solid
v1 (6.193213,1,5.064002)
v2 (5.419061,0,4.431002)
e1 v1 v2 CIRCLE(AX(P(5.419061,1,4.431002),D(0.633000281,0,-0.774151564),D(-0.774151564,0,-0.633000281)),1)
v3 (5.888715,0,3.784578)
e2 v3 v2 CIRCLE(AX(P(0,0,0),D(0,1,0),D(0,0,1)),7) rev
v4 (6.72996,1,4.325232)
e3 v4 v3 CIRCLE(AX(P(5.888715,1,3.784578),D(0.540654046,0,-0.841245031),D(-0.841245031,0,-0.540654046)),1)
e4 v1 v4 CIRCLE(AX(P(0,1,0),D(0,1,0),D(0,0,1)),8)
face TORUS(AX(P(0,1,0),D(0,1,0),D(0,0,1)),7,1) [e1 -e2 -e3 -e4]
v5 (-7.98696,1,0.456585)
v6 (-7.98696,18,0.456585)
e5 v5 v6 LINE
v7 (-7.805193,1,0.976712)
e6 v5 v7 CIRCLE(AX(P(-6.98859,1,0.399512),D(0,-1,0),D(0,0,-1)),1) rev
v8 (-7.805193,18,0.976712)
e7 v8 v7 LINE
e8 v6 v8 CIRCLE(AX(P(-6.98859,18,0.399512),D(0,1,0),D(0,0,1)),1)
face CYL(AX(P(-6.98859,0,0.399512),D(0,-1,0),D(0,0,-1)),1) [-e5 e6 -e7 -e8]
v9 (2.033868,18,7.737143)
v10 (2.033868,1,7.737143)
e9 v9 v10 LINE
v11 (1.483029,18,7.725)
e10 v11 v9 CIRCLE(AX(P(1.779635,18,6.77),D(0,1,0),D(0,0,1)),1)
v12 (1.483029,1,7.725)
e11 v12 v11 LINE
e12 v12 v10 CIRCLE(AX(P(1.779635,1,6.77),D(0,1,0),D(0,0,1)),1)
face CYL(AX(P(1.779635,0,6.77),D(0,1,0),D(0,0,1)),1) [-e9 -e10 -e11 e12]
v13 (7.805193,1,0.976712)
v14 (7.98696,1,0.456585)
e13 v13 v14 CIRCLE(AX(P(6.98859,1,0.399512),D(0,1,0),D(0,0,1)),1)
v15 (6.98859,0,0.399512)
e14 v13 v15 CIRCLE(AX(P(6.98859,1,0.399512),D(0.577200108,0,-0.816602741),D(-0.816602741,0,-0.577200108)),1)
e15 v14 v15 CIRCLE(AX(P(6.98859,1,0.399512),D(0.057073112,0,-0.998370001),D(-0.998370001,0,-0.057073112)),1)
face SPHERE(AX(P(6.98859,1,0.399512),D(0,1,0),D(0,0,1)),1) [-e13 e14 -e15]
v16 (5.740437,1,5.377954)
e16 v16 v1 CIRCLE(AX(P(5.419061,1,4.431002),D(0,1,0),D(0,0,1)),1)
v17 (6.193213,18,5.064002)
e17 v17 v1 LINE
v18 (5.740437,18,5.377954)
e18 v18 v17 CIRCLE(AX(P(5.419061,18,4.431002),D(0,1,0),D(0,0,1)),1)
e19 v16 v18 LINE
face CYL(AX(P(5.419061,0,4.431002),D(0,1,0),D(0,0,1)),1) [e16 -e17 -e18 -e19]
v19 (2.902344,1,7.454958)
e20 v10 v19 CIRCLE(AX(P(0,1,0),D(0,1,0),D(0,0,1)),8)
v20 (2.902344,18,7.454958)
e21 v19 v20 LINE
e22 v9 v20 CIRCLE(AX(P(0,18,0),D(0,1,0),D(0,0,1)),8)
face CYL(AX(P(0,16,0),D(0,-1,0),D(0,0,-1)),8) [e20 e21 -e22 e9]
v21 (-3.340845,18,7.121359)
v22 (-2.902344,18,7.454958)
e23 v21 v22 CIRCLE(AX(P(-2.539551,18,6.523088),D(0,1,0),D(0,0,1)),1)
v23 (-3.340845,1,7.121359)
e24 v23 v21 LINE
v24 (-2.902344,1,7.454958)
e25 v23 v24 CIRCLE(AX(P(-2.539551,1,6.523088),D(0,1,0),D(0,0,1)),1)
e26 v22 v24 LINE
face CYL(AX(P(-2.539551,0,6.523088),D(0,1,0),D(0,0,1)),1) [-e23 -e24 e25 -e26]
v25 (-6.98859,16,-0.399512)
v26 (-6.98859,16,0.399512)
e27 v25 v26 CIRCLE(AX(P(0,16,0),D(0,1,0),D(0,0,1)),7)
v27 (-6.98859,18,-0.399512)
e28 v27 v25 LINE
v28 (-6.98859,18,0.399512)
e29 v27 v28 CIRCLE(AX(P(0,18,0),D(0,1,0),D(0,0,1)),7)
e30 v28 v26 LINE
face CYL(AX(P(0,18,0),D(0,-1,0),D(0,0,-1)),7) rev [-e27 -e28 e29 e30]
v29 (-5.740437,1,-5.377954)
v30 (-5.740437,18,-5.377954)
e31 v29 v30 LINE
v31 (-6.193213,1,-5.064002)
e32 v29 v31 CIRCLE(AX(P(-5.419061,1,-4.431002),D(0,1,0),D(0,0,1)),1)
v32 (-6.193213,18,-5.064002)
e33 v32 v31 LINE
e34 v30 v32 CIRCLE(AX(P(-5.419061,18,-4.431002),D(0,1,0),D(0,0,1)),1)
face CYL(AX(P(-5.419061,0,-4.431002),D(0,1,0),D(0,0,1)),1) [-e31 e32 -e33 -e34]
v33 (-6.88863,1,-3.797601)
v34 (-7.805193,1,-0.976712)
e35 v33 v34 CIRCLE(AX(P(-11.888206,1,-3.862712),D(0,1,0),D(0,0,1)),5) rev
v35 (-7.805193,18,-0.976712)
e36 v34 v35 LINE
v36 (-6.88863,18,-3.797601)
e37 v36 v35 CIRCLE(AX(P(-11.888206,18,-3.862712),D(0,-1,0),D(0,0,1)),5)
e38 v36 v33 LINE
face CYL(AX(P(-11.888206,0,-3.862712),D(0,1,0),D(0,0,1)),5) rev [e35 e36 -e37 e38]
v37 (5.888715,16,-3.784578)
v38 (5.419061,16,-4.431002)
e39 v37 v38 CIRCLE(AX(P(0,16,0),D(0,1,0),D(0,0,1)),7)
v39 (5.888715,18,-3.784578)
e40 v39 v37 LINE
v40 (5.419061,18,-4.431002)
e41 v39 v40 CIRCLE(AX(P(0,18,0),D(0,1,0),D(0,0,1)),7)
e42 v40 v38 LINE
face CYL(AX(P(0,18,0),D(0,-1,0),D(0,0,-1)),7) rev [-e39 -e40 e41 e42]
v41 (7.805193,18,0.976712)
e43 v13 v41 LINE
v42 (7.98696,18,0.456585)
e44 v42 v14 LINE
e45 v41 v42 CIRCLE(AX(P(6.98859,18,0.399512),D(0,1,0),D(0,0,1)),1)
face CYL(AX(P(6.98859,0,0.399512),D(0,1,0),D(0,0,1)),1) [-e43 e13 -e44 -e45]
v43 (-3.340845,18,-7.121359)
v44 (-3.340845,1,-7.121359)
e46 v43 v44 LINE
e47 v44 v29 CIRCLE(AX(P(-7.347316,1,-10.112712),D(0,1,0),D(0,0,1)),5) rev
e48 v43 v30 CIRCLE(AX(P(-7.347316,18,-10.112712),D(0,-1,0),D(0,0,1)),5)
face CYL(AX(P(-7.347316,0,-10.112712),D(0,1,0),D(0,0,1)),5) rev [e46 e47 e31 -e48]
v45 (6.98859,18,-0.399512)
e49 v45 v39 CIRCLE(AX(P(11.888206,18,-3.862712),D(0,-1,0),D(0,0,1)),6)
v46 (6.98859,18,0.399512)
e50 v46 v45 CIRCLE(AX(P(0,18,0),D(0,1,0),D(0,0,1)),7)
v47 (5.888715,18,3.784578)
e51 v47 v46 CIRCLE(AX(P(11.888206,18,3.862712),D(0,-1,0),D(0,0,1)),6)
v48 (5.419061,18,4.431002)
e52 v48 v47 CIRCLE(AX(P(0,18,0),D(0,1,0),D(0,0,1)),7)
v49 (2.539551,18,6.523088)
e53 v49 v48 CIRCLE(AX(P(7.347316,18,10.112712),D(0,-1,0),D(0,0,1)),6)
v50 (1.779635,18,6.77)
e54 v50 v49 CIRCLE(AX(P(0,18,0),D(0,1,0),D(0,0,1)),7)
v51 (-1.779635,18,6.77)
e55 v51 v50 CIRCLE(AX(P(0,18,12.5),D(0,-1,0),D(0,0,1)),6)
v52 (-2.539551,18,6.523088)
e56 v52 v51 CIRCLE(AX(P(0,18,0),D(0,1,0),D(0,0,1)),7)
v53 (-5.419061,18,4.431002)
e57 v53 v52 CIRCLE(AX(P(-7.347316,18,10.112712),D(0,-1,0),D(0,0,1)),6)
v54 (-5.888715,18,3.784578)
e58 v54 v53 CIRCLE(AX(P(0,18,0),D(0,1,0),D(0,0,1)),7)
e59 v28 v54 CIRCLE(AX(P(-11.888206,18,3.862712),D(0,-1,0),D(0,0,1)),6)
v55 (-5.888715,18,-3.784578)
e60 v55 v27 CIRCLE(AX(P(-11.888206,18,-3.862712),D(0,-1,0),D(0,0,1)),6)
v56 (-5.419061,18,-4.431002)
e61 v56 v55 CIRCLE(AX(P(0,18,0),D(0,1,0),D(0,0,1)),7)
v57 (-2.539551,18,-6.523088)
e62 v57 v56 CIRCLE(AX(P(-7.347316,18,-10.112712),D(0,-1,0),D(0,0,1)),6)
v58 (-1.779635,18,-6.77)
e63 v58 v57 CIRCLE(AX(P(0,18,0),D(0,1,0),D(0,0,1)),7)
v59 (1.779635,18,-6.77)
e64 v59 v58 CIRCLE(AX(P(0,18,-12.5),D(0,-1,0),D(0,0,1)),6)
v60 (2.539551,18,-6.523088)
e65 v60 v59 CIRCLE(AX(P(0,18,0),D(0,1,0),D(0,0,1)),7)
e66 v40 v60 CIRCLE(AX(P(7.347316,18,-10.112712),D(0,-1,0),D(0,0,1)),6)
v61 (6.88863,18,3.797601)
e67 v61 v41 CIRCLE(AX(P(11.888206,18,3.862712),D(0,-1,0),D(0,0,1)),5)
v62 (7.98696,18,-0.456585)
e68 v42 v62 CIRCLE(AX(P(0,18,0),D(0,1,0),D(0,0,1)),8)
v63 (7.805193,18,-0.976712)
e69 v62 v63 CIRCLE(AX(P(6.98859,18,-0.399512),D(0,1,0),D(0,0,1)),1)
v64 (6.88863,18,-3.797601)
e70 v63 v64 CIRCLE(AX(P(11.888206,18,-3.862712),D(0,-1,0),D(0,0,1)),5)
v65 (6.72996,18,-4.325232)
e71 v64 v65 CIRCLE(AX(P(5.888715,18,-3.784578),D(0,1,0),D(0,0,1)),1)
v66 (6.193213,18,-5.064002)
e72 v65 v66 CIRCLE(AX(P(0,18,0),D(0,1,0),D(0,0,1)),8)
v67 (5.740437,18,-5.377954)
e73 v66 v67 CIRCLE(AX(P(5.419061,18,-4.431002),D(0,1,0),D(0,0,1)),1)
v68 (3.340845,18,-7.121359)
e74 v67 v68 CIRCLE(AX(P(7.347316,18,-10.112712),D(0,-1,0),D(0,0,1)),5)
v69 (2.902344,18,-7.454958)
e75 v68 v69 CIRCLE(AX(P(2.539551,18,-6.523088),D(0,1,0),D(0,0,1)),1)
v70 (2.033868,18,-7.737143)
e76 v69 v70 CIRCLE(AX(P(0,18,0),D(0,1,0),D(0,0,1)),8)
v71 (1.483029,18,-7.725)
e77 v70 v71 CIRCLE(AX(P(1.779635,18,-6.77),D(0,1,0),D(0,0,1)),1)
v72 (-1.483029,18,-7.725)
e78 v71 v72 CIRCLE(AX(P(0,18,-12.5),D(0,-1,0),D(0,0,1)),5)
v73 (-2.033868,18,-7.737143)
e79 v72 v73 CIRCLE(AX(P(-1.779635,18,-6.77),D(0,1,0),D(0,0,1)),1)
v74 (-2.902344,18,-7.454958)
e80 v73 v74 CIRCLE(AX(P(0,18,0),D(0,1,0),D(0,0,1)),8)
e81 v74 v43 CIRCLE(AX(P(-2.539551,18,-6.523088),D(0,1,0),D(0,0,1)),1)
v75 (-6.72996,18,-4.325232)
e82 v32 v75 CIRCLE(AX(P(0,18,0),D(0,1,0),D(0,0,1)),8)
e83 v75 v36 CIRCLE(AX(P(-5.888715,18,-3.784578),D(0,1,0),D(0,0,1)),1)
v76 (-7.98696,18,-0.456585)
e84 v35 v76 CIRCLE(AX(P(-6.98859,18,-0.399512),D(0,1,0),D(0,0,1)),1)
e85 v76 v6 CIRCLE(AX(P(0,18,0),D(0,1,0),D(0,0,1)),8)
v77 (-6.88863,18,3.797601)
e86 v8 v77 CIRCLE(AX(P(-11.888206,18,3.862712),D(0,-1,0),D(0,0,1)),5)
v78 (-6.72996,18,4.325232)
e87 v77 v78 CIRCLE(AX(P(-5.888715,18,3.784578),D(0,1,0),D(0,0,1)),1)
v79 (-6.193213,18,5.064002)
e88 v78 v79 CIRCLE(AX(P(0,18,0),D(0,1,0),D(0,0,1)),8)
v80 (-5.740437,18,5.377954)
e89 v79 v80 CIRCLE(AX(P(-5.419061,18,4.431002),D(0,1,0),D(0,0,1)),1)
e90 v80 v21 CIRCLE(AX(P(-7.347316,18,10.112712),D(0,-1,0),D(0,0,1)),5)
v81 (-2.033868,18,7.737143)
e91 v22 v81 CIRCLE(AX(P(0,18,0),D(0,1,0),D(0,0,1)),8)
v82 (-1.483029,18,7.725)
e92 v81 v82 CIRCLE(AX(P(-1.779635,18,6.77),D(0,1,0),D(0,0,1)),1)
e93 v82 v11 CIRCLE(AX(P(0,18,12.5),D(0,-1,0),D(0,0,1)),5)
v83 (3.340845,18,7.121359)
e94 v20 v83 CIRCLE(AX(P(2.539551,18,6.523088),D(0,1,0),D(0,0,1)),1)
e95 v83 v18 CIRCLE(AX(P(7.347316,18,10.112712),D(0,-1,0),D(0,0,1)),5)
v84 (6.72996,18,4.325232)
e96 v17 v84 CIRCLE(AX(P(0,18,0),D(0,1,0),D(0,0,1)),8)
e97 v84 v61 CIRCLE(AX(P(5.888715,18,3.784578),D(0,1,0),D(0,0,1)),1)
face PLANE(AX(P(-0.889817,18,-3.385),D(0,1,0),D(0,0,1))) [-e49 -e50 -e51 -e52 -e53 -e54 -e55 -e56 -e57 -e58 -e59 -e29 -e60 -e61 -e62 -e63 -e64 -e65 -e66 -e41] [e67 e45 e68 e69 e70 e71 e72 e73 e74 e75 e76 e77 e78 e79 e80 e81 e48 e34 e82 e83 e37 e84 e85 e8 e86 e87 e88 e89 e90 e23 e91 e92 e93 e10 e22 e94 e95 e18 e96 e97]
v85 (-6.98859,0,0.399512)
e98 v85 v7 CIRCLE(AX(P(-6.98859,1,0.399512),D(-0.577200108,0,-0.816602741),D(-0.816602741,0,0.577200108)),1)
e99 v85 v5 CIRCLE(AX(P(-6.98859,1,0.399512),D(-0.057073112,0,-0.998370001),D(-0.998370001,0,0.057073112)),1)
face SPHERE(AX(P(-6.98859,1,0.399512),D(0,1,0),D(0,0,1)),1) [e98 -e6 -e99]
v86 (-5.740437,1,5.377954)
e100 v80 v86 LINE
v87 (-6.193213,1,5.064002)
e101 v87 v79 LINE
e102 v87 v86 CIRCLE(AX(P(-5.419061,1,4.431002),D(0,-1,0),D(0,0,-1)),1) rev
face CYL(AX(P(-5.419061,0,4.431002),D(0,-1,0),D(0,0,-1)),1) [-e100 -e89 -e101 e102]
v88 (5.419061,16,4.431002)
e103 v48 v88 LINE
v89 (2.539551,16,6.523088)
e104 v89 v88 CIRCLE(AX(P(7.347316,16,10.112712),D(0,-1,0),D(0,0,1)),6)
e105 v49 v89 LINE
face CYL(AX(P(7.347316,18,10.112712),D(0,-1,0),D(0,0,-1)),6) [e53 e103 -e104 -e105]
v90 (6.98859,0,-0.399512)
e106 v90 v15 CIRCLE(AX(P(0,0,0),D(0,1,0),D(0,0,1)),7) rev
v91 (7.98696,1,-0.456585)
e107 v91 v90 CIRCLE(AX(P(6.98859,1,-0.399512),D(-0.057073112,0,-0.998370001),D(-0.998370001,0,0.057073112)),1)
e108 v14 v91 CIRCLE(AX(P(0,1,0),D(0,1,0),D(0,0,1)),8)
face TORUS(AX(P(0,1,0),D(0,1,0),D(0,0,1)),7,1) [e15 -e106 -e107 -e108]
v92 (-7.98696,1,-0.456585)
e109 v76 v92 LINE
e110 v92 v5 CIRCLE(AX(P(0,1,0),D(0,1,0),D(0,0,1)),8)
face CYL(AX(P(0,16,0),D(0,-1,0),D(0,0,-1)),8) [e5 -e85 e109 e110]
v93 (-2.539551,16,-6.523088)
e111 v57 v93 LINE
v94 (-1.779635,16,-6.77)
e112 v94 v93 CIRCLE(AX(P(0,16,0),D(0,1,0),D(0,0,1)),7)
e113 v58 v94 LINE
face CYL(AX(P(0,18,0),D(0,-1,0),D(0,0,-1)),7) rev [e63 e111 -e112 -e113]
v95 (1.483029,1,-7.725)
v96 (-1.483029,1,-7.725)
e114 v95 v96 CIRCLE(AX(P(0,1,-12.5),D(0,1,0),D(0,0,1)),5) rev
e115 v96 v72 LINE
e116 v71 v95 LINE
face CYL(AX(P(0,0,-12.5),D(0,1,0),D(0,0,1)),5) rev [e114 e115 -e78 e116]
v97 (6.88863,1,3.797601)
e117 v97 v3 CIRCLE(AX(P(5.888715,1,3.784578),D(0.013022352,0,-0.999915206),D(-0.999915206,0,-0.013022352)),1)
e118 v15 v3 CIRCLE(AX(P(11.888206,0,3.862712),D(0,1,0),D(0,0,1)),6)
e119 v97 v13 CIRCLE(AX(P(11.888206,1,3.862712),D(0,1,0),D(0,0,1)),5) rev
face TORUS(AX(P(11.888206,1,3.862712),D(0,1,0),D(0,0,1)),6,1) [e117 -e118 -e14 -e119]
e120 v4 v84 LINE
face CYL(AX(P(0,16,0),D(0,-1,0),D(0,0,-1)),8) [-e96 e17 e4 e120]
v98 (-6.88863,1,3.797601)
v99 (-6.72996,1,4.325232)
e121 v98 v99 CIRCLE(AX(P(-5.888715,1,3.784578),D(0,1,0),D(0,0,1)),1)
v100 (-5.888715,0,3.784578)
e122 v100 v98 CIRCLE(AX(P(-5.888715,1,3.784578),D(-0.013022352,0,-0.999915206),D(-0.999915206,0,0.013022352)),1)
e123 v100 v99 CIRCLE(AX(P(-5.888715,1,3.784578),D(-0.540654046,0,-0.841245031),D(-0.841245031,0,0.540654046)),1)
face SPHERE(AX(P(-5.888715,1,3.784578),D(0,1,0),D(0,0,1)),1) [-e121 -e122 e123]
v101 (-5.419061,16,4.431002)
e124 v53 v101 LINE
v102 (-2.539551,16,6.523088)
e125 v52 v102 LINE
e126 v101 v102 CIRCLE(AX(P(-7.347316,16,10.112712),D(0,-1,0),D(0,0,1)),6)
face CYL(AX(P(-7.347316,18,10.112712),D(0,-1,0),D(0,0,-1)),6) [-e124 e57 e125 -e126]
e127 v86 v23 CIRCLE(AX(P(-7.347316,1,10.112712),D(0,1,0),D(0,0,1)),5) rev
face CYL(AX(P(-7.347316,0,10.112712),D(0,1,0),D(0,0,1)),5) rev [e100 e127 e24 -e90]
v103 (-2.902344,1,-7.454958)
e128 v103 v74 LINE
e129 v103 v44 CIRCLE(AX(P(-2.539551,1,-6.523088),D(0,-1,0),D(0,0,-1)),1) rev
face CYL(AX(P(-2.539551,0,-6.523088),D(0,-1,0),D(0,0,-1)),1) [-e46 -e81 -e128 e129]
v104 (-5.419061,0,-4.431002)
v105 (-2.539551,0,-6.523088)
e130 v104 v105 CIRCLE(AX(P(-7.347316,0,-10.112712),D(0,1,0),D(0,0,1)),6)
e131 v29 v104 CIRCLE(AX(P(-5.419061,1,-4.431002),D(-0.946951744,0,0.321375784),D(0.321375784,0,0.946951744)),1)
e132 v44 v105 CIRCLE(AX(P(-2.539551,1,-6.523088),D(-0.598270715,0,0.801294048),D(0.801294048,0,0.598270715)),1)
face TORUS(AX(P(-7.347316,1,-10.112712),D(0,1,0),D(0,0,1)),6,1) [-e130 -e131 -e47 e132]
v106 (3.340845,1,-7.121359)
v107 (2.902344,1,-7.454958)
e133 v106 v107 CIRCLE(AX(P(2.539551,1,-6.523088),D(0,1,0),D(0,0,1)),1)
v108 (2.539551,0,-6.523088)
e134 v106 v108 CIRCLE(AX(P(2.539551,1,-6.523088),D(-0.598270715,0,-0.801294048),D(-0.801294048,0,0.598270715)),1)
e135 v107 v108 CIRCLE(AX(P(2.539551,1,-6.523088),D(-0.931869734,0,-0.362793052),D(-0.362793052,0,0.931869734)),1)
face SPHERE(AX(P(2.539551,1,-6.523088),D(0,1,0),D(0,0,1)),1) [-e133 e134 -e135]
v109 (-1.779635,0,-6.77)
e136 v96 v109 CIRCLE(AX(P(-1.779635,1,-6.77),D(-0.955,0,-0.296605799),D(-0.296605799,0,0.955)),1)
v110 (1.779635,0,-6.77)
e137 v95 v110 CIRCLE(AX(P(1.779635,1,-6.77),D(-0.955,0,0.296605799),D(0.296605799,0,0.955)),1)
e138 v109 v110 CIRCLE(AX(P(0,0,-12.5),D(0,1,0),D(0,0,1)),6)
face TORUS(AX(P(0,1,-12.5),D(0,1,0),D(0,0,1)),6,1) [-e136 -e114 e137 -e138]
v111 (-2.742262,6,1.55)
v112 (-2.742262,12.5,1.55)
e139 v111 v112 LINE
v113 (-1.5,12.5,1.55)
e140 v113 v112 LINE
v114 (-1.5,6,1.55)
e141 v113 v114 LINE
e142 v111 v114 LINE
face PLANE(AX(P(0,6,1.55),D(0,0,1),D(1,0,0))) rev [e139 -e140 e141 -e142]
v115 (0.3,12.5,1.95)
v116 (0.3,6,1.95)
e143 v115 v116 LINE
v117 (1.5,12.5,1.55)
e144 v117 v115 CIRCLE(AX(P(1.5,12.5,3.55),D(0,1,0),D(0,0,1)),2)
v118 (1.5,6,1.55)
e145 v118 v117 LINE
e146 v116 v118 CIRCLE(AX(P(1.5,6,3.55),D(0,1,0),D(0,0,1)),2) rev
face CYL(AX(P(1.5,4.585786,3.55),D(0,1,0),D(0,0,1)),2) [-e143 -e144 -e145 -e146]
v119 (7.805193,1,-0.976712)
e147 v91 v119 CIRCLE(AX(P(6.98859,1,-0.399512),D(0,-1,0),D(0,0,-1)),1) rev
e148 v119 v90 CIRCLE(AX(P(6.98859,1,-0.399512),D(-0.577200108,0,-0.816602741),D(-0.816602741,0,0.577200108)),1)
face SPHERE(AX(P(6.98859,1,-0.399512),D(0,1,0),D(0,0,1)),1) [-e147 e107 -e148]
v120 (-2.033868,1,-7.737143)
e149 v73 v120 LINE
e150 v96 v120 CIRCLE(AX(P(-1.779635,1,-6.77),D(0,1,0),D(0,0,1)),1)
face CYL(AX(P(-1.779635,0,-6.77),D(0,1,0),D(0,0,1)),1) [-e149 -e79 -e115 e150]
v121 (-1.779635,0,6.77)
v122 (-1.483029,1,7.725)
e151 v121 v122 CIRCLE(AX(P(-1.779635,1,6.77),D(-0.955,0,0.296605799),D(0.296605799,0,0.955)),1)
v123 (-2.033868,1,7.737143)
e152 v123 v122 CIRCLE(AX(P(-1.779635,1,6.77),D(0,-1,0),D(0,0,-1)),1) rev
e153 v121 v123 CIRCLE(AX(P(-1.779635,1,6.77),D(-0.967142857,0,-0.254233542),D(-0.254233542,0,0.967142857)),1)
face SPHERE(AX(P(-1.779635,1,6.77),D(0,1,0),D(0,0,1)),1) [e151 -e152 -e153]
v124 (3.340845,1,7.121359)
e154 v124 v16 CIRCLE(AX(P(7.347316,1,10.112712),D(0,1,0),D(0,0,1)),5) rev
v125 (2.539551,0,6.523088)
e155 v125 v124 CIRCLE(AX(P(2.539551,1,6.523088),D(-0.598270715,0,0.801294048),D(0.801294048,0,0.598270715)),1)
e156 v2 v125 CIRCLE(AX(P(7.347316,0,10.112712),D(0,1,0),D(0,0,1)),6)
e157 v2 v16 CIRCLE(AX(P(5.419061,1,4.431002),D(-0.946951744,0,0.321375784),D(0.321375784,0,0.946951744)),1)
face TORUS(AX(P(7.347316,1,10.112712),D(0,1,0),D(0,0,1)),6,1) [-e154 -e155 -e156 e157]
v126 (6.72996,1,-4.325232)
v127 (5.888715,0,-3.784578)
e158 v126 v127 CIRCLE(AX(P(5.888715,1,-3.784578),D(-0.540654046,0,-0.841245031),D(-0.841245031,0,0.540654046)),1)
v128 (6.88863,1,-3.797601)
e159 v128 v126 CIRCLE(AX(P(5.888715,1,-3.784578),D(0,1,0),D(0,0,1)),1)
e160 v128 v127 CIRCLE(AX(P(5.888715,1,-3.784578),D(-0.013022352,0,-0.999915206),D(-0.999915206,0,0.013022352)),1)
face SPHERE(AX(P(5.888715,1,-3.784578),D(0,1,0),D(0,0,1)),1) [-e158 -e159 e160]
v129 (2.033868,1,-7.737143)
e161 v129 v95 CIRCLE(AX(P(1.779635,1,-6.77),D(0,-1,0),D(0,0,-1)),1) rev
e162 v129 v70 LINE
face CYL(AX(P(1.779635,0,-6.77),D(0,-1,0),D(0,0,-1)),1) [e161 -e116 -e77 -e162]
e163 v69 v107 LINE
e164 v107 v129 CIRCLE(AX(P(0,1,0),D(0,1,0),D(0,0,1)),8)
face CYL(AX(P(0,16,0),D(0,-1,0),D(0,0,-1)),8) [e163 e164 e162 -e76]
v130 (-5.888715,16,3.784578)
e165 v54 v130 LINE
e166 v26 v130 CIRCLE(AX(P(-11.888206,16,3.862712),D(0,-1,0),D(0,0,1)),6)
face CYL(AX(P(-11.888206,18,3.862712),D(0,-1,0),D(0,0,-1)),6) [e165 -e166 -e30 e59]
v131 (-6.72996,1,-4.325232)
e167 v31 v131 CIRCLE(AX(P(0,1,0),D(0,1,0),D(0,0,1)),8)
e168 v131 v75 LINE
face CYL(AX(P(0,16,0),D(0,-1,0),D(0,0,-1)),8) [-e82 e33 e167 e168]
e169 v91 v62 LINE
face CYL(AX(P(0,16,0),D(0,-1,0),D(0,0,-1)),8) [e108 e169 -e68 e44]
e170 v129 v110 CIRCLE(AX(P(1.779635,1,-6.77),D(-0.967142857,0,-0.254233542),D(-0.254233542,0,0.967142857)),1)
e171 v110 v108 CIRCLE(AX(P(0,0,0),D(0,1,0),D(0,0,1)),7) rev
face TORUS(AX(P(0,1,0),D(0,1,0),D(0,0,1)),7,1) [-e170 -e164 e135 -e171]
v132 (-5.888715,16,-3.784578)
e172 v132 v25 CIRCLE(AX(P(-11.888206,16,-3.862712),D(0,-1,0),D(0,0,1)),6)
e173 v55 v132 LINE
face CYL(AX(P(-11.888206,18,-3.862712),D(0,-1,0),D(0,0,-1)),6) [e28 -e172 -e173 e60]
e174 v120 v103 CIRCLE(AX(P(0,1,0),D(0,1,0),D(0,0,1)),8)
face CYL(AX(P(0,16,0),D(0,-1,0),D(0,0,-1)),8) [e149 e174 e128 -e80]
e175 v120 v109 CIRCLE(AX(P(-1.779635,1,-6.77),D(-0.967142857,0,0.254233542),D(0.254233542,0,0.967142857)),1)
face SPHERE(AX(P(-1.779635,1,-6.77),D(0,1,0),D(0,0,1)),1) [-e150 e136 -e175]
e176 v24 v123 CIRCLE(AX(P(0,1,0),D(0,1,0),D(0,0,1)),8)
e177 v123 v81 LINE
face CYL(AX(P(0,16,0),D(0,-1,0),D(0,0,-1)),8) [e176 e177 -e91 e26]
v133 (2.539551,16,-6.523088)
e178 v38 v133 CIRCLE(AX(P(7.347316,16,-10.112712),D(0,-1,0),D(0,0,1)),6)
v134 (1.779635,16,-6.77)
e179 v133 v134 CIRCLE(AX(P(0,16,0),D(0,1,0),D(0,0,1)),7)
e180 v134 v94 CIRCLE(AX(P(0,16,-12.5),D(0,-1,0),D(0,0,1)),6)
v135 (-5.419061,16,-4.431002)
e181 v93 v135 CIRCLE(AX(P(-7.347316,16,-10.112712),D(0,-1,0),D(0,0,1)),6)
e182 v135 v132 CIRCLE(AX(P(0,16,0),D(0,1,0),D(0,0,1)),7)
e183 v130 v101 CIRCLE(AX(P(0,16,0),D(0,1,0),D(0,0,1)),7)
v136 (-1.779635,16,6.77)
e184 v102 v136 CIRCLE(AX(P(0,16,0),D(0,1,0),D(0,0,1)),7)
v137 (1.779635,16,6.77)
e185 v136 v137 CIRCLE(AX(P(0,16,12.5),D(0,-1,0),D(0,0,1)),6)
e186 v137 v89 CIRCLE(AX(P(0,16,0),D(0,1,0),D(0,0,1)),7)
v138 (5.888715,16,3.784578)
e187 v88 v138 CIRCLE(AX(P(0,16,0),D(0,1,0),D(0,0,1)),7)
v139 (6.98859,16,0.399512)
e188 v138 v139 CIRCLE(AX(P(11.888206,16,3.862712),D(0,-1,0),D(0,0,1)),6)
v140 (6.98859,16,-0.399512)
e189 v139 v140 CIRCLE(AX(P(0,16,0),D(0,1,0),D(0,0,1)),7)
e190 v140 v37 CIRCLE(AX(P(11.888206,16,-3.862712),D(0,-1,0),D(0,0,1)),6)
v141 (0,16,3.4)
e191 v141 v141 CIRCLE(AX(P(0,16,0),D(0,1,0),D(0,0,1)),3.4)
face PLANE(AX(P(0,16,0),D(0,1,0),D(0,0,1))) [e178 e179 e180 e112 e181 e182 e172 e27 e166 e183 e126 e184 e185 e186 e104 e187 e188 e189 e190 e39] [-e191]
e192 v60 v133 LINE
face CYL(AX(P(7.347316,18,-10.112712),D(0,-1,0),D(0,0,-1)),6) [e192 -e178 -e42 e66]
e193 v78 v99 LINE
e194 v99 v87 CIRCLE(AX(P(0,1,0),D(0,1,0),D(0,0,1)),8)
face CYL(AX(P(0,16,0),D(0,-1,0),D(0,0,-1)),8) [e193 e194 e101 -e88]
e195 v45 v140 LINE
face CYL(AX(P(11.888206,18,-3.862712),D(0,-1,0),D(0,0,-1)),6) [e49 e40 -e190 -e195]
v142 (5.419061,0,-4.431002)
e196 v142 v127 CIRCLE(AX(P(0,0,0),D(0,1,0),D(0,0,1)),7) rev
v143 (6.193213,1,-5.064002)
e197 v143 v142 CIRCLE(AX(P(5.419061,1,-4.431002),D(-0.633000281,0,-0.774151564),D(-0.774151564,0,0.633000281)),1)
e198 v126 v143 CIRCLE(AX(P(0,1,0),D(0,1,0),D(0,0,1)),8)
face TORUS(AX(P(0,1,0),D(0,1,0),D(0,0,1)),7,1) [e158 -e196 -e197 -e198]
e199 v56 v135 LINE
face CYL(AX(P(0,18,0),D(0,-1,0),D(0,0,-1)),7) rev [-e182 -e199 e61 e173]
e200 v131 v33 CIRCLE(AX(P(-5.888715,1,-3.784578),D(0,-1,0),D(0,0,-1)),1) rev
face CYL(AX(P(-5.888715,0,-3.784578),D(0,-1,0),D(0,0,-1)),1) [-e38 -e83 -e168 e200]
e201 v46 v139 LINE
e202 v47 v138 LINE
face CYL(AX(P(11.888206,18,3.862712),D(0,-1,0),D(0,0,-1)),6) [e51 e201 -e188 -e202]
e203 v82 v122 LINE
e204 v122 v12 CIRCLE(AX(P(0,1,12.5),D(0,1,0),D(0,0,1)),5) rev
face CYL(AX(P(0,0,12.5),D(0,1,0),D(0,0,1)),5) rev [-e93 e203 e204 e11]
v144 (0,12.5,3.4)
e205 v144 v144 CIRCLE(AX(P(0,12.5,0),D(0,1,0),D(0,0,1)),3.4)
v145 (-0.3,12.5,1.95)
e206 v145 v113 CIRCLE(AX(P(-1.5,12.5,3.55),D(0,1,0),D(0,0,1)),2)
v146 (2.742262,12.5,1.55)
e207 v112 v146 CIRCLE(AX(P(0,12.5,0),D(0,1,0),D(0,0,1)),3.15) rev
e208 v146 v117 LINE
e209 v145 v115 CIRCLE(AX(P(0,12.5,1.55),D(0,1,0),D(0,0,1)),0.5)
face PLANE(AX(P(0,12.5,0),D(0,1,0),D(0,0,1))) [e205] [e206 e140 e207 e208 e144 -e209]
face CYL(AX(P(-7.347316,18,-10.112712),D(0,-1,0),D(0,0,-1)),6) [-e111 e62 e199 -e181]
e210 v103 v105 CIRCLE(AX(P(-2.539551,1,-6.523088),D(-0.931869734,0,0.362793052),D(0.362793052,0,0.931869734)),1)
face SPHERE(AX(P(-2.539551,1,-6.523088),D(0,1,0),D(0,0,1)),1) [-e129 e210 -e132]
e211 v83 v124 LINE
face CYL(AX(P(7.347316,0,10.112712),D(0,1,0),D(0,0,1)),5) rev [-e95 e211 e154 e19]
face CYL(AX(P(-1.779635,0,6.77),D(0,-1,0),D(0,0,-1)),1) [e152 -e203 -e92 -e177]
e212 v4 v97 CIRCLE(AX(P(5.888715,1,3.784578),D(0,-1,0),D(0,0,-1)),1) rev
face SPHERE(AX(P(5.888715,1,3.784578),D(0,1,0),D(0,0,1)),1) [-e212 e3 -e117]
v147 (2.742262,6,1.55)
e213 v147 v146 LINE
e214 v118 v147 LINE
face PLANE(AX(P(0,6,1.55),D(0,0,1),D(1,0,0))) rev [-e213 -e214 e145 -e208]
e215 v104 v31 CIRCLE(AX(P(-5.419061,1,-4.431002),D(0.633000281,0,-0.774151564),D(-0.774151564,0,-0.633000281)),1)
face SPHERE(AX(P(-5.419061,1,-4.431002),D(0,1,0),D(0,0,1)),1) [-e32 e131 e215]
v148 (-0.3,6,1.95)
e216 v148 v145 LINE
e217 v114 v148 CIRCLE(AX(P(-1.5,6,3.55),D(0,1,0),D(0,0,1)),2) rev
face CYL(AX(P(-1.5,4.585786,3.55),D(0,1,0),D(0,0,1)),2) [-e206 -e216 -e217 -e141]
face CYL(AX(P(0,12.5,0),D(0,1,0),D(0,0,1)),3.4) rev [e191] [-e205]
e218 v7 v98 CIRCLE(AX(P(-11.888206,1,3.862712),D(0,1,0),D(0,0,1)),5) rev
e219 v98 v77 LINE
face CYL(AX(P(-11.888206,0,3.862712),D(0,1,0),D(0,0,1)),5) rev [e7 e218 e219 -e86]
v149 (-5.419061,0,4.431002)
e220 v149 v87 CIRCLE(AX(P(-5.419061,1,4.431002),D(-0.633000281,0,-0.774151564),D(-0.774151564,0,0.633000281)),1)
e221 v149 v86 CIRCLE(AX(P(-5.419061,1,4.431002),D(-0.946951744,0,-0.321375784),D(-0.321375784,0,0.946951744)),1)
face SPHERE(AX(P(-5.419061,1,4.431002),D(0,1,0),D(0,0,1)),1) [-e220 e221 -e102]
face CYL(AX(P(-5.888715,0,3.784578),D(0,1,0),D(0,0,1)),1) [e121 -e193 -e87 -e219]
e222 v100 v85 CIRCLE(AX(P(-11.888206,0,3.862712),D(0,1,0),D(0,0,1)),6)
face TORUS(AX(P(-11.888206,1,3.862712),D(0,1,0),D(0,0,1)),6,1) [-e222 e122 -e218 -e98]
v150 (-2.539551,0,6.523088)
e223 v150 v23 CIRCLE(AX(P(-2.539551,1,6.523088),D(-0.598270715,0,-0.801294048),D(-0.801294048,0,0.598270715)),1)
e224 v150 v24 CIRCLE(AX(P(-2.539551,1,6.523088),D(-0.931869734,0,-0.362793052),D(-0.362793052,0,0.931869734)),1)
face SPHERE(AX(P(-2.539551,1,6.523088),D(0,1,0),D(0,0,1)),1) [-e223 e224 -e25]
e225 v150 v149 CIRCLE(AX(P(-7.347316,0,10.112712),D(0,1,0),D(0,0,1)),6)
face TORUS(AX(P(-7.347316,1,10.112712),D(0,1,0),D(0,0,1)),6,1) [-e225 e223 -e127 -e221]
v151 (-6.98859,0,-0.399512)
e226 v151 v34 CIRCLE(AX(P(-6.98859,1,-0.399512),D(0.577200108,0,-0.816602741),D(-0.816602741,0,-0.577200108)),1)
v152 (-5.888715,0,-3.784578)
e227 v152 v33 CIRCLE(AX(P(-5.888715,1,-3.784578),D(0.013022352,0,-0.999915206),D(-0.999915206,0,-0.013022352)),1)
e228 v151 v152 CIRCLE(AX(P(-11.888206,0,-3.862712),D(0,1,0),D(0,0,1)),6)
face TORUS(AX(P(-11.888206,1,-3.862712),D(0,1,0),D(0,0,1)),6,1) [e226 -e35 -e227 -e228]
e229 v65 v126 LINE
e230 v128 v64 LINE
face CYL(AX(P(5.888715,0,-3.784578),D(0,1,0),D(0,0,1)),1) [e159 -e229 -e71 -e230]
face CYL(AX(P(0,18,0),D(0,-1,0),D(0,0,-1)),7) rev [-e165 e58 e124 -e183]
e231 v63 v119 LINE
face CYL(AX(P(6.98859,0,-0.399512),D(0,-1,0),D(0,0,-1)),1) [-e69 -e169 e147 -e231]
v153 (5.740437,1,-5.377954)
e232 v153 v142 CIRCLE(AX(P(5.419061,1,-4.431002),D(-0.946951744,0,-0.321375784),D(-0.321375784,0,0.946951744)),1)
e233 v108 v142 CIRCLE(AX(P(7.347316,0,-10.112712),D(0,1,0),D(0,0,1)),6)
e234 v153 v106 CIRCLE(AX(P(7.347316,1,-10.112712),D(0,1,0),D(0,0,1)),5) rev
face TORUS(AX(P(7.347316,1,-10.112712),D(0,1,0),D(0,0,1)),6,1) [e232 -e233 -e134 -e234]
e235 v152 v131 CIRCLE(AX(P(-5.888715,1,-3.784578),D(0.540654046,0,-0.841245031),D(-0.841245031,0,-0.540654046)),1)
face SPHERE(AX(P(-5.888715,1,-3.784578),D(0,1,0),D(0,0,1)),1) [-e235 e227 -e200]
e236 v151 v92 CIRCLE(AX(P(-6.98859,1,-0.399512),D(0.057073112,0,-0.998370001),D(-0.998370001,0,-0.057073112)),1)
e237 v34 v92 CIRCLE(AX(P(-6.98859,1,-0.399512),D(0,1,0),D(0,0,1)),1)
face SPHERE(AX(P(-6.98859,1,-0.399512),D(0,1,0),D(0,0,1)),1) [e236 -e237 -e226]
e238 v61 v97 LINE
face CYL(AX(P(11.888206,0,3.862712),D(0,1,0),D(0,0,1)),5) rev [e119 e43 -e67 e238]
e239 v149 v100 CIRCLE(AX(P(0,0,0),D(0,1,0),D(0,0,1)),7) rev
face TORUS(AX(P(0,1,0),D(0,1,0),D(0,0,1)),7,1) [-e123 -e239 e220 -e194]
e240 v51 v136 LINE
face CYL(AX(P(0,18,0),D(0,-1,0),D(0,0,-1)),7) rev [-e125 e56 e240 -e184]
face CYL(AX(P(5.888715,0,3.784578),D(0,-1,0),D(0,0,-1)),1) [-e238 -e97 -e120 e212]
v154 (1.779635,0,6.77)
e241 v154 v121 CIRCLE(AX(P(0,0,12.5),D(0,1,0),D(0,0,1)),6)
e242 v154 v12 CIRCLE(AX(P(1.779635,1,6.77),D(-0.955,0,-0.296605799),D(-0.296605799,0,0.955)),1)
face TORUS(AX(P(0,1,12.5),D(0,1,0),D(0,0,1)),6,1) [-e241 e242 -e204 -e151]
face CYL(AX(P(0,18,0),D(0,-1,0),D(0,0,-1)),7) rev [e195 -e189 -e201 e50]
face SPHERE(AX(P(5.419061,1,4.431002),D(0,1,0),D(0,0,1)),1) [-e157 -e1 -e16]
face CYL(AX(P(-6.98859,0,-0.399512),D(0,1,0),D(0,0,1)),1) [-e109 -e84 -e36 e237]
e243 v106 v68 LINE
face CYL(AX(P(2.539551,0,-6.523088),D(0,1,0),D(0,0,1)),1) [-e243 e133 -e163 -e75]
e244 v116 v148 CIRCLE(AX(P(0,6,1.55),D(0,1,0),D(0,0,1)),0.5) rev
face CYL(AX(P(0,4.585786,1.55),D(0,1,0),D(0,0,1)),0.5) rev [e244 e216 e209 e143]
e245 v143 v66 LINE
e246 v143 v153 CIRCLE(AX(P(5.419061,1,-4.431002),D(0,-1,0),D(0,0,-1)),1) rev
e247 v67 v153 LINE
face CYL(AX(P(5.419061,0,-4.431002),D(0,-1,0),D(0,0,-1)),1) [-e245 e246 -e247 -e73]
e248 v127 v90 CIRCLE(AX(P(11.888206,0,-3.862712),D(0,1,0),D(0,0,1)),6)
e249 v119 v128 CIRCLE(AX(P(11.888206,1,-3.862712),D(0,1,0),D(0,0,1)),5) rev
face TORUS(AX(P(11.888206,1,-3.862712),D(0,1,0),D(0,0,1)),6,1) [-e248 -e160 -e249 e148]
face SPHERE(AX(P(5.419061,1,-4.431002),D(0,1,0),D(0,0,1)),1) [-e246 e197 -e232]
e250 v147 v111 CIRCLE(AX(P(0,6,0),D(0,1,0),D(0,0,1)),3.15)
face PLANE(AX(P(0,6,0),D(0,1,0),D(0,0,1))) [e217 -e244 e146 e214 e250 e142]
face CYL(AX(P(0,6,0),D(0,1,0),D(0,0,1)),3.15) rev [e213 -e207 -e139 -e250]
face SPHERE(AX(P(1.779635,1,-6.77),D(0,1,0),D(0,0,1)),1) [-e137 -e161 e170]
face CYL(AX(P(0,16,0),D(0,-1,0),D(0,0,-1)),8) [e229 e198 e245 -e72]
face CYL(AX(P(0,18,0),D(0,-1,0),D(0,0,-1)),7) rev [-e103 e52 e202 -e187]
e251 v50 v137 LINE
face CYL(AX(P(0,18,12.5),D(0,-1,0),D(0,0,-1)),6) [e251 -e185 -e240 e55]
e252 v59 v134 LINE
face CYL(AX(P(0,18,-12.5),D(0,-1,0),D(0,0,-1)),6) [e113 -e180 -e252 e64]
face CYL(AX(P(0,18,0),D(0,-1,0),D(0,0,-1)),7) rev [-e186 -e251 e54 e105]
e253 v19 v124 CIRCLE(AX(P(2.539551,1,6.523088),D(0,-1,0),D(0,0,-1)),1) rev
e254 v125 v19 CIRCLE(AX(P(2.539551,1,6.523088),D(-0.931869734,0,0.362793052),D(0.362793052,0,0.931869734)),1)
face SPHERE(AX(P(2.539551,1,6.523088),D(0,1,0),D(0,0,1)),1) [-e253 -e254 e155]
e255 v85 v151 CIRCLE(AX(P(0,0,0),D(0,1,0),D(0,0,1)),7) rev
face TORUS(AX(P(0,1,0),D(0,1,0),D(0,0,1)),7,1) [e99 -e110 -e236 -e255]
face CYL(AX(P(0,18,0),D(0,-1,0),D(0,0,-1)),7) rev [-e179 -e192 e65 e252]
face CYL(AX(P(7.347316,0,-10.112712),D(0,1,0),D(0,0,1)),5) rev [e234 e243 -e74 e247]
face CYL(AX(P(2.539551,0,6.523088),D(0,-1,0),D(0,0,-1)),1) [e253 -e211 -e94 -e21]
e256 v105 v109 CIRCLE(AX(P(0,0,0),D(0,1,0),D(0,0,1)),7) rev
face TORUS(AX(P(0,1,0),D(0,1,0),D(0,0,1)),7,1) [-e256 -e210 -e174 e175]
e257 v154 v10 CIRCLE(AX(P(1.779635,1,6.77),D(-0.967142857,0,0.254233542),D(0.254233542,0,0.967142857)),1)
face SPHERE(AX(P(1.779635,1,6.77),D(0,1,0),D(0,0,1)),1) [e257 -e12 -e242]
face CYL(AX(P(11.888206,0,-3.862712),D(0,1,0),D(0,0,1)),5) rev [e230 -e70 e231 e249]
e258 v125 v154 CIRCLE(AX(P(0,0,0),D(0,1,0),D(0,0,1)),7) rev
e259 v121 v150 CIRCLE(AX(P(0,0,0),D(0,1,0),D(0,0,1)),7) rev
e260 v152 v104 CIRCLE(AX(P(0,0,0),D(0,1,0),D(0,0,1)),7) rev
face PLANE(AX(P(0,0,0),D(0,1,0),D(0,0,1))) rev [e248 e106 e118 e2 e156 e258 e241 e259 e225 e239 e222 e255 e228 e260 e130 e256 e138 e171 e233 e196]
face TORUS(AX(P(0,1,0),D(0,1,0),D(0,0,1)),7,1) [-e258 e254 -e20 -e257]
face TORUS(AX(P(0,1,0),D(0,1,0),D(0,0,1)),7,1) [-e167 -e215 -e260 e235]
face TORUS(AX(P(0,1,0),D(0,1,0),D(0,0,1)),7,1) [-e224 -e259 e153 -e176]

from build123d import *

# Parameters (mm, degrees)
ESQUISSE1_R                  = 8
BOSS_EXTRU_1_DEPTH           = 16
ENL_V_MAT_EXTRU_1_DEPTH      = 10
ESQUISSE3_R                  = 5
ENL_V_MAT_EXTRU_2_DEPTH      = 20.595917942
R_P_TITION_CIRCULAIRE1_COUNT = 10
CONG_1_R                     = 1
CONG_2_R                     = 1
BOSS_EXTRU_2_DEPTH           = 2
ESQUISSE5_R                  = 3.4
ENL_V_MAT_EXTRU_3_DEPTH      = 3.5
ESQUISSE6_R                  = 0.5
ENL_V_MAT_EXTRU_4_DEPTH      = 6.5
CONG_3_R                     = 2


# Some blends are built 0.0001 mm under size
with BuildPart() as part:
    # Esquisse1 → Boss.-Extru.1 (new body)
    with BuildSketch(Plane(origin=(0, 0, 0), x_dir=(1, 0, 0), z_dir=(0, 1, 0))):
        with Locations(Location((0, 0, 0), (0, 0, 270))):
            Circle(ESQUISSE1_R)
    extrude(amount=BOSS_EXTRU_1_DEPTH)

    # Esquisse2 → Enlèv. mat.-Extru.1 (cut)
    with BuildSketch(Plane(origin=(0, 16, 0), x_dir=(1, 0, 0), z_dir=(0, 1, 0))):
        with BuildLine():
            ThreePointArc((0, 3.15), (-2.720753572, 1.587450787), (-2.74226184, -1.55))
            Line((-2.74226184, -1.55), (0, -1.55))
            Line((0, -1.55), (0, 3.15))
        make_face()
        with BuildLine():
            Line((0, 3.15), (0, -1.55))
            Line((0, -1.55), (2.74226184, -1.55))
            ThreePointArc((2.74226184, -1.55), (3.046360517, -0.801366085), (3.15, 0))
            ThreePointArc((3.15, 0), (2.227386361, 2.227386361), (0, 3.15))
        make_face()
    extrude(amount=-ENL_V_MAT_EXTRU_1_DEPTH, mode=Mode.SUBTRACT)

    # Esquisse3 → Enlèv. mat.-Extru.2 (cut, through all)
    with BuildSketch(Plane(origin=(0, 16, 0), x_dir=(1, 0, 0), z_dir=(0, 1, 0))):
        with Locations((0, 12.5)):
            Circle(ESQUISSE3_R)
    enl_v_mat_extru_2 = extrude(amount=-ENL_V_MAT_EXTRU_2_DEPTH, mode=Mode.SUBTRACT)

    # Répétition circulaire1: Enlèv. mat.-Extru.2 ×10 about axis
    r_p_tition_circulaire1_axis = Axis((0, 0, 0), (0, 1, 0))
    for i in range(1, R_P_TITION_CIRCULAIRE1_COUNT):
        add(enl_v_mat_extru_2.rotate(r_p_tition_circulaire1_axis, i * 360 / R_P_TITION_CIRCULAIRE1_COUNT), mode=Mode.SUBTRACT)

    # Congé1
    cong_1_edges = [part.edges().sort_by_distance(p)[0] for p in [
        (1.733176275, 8, -7.81),
        (-1.733176275, 8, -7.81),
        (-3.18843376, 8, -7.33715818),
        (-5.992771881, 8, -5.299687272),
        (-6.892170469, 8, -4.061771316),
        (-7.963332315, 8, -0.765074136),
        (-1.733176275, 8, 7.81),
        (1.733176275, 8, 7.81),
        (-7.963332315, 8, 0.765074136),
        (-6.892170469, 8, 4.061771316),
        (-5.992771881, 8, 5.299687272),
        (-3.18843376, 8, 7.33715818),
        (3.18843376, 8, 7.33715818),
        (5.992771881, 8, 5.299687272),
        (6.892170469, 8, 4.061771316),
        (7.963332315, 8, 0.765074136),
        (7.963332315, 8, -0.765074136),
        (6.892170469, 8, -4.061771316),
        (5.992771881, 8, -5.299687272),
        (3.18843376, 8, -7.33715818),
    ]]
    fillet(cong_1_edges, radius=CONG_1_R)

    # Congé2
    cong_2_edges = [part.edges().sort_by_distance(p)[0] for p in [
        (-2.472135955, 0, -7.60845213),
        (-6.472135955, 0, -4.702282018),
        (-4.408389392, 0, -6.067627458),
        (0, 0, -7.5),
        (2.472135955, 0, -7.60845213),
        (4.408389392, 0, -6.067627458),
        (6.472135955, 0, -4.702282018),
        (7.132923872, 0, -2.317627458),
        (8, 0, 0),
        (7.132923872, 0, 2.317627458),
        (6.472135955, 0, 4.702282018),
        (4.408389392, 0, 6.067627458),
        (2.472135955, 0, 7.60845213),
        (0, 0, 7.5),
        (-2.472135955, 0, 7.60845213),
        (-4.408389392, 0, 6.067627458),
        (-6.472135955, 0, 4.702282018),
        (-7.132923872, 0, 2.317627458),
        (-8, 0, 0),
        (-7.132923872, 0, -2.317627458),
        (-6.846351136, 0, -4.072559992),
        (-5.988873569, 0, -5.252776613),
        (-3.145023717, 0, -7.318954474),
        (-7.932605121, 0, -0.729413986),
        (-7.932605121, 0, 0.729413986),
        (-6.846351136, 0, 4.072559992),
        (-5.988873569, 0, 5.252776613),
        (-3.145023717, 0, 7.318954474),
        (-1.757595867, 0, 7.769757109),
        (1.757595867, 0, 7.769757109),
        (3.145023717, 0, 7.318954474),
        (5.988873569, 0, 5.252776613),
        (6.846351136, 0, 4.072559992),
        (7.932605121, 0, 0.729413986),
        (7.932605121, 0, -0.729413986),
        (6.846351136, 0, -4.072559992),
        (5.988873569, 0, -5.252776613),
        (3.145023717, 0, -7.318954474),
        (1.757595867, 0, -7.769757109),
        (-1.757595867, 0, -7.769757109),
    ]]
    fillet(cong_2_edges, radius=CONG_2_R - 0.0001)  # a hair under: the kernel refuses the full size

    # Esquisse4 → Boss.-Extru.2 (add)
    with BuildSketch(Plane(origin=(0, 16, 0), x_dir=(1, 0, 0), z_dir=(0, 1, 0))):
        with BuildLine():
            ThreePointArc((-1.483028995, 7.725), (0, 7.5), (1.483028995, 7.725))
            ThreePointArc((1.483028995, 7.725), (1.757595867, 7.769757113), (2.033868336, 7.737142857))
            ThreePointArc((2.033868336, 7.737142857), (2.472135955, 7.60845213), (2.902344418, 7.454957872))
            ThreePointArc((2.902344418, 7.454957872), (3.145023719, 7.318954477), (3.340845414, 7.121358854))
            ThreePointArc((3.340845414, 7.121358854), (4.408389392, 6.067627458), (5.740436734, 5.37795371))
            ThreePointArc((5.740436734, 5.37795371), (5.988873571, 5.252776617), (6.193212514, 5.064002246))
            ThreePointArc((6.193212514, 5.064002246), (6.472135955, 4.702282018), (6.729960252, 4.325232365))
            ThreePointArc((6.729960252, 4.325232365), (6.84635114, 4.072559993), (6.888630426, 3.797600671))
            ThreePointArc((6.888630426, 3.797600671), (7.132923872, 2.317627458), (7.805192751, 0.976711892))
            ThreePointArc((7.805192751, 0.976711892), (7.932605125, 0.729413987), (7.986960012, 0.456584897))
            ThreePointArc((7.986960012, 0.456584897), (8, 0), (7.986960012, -0.456584897))
            ThreePointArc((7.986960012, -0.456584897), (7.932605125, -0.729413987), (7.805192751, -0.976711892))
            ThreePointArc((7.805192751, -0.976711892), (7.132923872, -2.317627458), (6.888630426, -3.797600671))
            ThreePointArc((6.888630426, -3.797600671), (6.84635114, -4.072559993), (6.729960252, -4.325232365))
            ThreePointArc((6.729960252, -4.325232365), (6.472135955, -4.702282018), (6.193212514, -5.064002246))
            ThreePointArc((6.193212514, -5.064002246), (5.988873571, -5.252776617), (5.740436734, -5.37795371))
            ThreePointArc((5.740436734, -5.37795371), (4.408389392, -6.067627458), (3.340845414, -7.121358854))
            ThreePointArc((3.340845414, -7.121358854), (3.145023719, -7.318954477), (2.902344418, -7.454957872))
            ThreePointArc((2.902344418, -7.454957872), (2.472135955, -7.60845213), (2.033868336, -7.737142857))
            ThreePointArc((2.033868336, -7.737142857), (1.757595867, -7.769757113), (1.483028995, -7.725))
            ThreePointArc((1.483028995, -7.725), (0, -7.5), (-1.483028995, -7.725))
            ThreePointArc((-1.483028995, -7.725), (-1.757595867, -7.769757113), (-2.033868336, -7.737142857))
            ThreePointArc((-2.033868336, -7.737142857), (-2.472135955, -7.60845213), (-2.902344418, -7.454957872))
            ThreePointArc((-2.902344418, -7.454957872), (-3.145023719, -7.318954477), (-3.340845414, -7.121358854))
            ThreePointArc((-3.340845414, -7.121358854), (-4.408389392, -6.067627458), (-5.740436734, -5.37795371))
            ThreePointArc((-5.740436734, -5.37795371), (-5.988873571, -5.252776617), (-6.193212514, -5.064002246))
            ThreePointArc((-6.193212514, -5.064002246), (-6.472135955, -4.702282018), (-6.729960252, -4.325232365))
            ThreePointArc((-6.729960252, -4.325232365), (-6.84635114, -4.072559993), (-6.888630426, -3.797600671))
            ThreePointArc((-6.888630426, -3.797600671), (-7.132923872, -2.317627458), (-7.805192751, -0.976711892))
            ThreePointArc((-7.805192751, -0.976711892), (-7.932605125, -0.729413987), (-7.986960012, -0.456584897))
            ThreePointArc((-7.986960012, -0.456584897), (-8, 0), (-7.986960012, 0.456584897))
            ThreePointArc((-7.986960012, 0.456584897), (-7.932605125, 0.729413987), (-7.805192751, 0.976711892))
            ThreePointArc((-7.805192751, 0.976711892), (-7.132923872, 2.317627458), (-6.888630426, 3.797600671))
            ThreePointArc((-6.888630426, 3.797600671), (-6.84635114, 4.072559993), (-6.729960252, 4.325232365))
            ThreePointArc((-6.729960252, 4.325232365), (-6.472135955, 4.702282018), (-6.193212514, 5.064002246))
            ThreePointArc((-6.193212514, 5.064002246), (-5.988873571, 5.252776617), (-5.740436734, 5.37795371))
            ThreePointArc((-5.740436734, 5.37795371), (-4.408389392, 6.067627458), (-3.340845414, 7.121358854))
            ThreePointArc((-3.340845414, 7.121358854), (-3.145023719, 7.318954477), (-2.902344418, 7.454957872))
            ThreePointArc((-2.902344418, 7.454957872), (-2.472135955, 7.60845213), (-2.033868336, 7.737142857))
            ThreePointArc((-2.033868336, 7.737142857), (-1.757595867, 7.769757113), (-1.483028995, 7.725))
        make_face()
        with BuildLine():
            ThreePointArc((-6.98859001, 0.399511784), (-6.181867356, 2.008610463), (-5.88871522, 3.784578319))
            ThreePointArc((-5.88871522, 3.784578319), (-5.663118961, 4.114496766), (-5.41906095, 4.431001966))
            ThreePointArc((-5.41906095, 4.431001966), (-3.82060414, 5.258610463), (-2.539551366, 6.523088138))
            ThreePointArc((-2.539551366, 6.523088138), (-2.163118961, 6.657395614), (-1.779634794, 6.77))
            ThreePointArc((-1.779634794, 6.77), (0, 6.5), (1.779634794, 6.77))
            ThreePointArc((1.779634794, 6.77), (2.163118961, 6.657395614), (2.539551366, 6.523088138))
            ThreePointArc((2.539551366, 6.523088138), (3.82060414, 5.258610463), (5.41906095, 4.431001966))
            ThreePointArc((5.41906095, 4.431001966), (5.663118961, 4.114496766), (5.88871522, 3.784578319))
            ThreePointArc((5.88871522, 3.784578319), (6.181867356, 2.008610463), (6.98859001, 0.399511784))
            ThreePointArc((6.98859001, 0.399511784), (7, 0), (6.98859001, -0.399511784))
            ThreePointArc((6.98859001, -0.399511784), (6.181867356, -2.008610463), (5.88871522, -3.784578319))
            ThreePointArc((5.88871522, -3.784578319), (5.663118961, -4.114496766), (5.41906095, -4.431001966))
            ThreePointArc((5.41906095, -4.431001966), (3.82060414, -5.258610463), (2.539551366, -6.523088138))
            ThreePointArc((2.539551366, -6.523088138), (2.163118961, -6.657395614), (1.779634794, -6.77))
            ThreePointArc((1.779634794, -6.77), (0, -6.5), (-1.779634794, -6.77))
            ThreePointArc((-1.779634794, -6.77), (-2.163118961, -6.657395614), (-2.539551366, -6.523088138))
            ThreePointArc((-2.539551366, -6.523088138), (-3.82060414, -5.258610463), (-5.41906095, -4.431001966))
            ThreePointArc((-5.41906095, -4.431001966), (-5.663118961, -4.114496766), (-5.88871522, -3.784578319))
            ThreePointArc((-5.88871522, -3.784578319), (-6.181867356, -2.008610463), (-6.98859001, -0.399511784))
            ThreePointArc((-6.98859001, -0.399511784), (-7, 0), (-6.98859001, 0.399511784))
        make_face(mode=Mode.SUBTRACT)
    extrude(amount=BOSS_EXTRU_2_DEPTH)

    # Esquisse5 → Enlèv. mat.-Extru.3 (cut)
    with BuildSketch(Plane(origin=(0, 16, 0), x_dir=(1, 0, 0), z_dir=(0, 1, 0))):
        with Locations(Location((0, 0, 0), (0, 0, 270))):
            Circle(ESQUISSE5_R)
    extrude(amount=-ENL_V_MAT_EXTRU_3_DEPTH, mode=Mode.SUBTRACT)

    # Esquisse6 → Enlèv. mat.-Extru.4 (cut)
    with BuildSketch(Plane(origin=(0, 12.5, 0), x_dir=(1, 0, 0), z_dir=(0, 1, 0))):
        with Locations((0, -1.55)):
            Circle(ESQUISSE6_R)
    extrude(amount=-ENL_V_MAT_EXTRU_4_DEPTH, mode=Mode.SUBTRACT)

    # Congé3
    # the kernel refuses this fillet: 2 mm, written as the material it takes off along each edge
    with BuildSketch(Plane(origin=(-0.5, 6, 1.55), x_dir=(-1, 0, 0), z_dir=(0, 1, 0))) as cong_3_piece_1:
        with BuildLine():
            CenterArc((1, 2), CONG_3_R, 233.130102354, 36.869897646)
            ThreePointArc((-0.2, 0.4), (-0.052786405, 0.223606798), (0, 0))
            Line((0, 0), (1, 0))
        make_face()
    extrude(amount=9, mode=Mode.SUBTRACT)
    with BuildSketch(Plane(origin=(0.5, 15, 1.55), x_dir=(-0.4472135954998809, 0, 0.8944271909999544), z_dir=(0, -1, 0))) as cong_3_piece_2:
        with BuildLine():
            CenterArc((1.341640786, -1.788854382), CONG_3_R, 116.565051177, 36.869897646)
            Line((-0.447213596, -0.894427191), (0, 0))
            ThreePointArc((0, 0), (0.223606798, -0.052786405), (0.447213595, 0))
        make_face()
    extrude(amount=9, mode=Mode.SUBTRACT)


solid = part.part
